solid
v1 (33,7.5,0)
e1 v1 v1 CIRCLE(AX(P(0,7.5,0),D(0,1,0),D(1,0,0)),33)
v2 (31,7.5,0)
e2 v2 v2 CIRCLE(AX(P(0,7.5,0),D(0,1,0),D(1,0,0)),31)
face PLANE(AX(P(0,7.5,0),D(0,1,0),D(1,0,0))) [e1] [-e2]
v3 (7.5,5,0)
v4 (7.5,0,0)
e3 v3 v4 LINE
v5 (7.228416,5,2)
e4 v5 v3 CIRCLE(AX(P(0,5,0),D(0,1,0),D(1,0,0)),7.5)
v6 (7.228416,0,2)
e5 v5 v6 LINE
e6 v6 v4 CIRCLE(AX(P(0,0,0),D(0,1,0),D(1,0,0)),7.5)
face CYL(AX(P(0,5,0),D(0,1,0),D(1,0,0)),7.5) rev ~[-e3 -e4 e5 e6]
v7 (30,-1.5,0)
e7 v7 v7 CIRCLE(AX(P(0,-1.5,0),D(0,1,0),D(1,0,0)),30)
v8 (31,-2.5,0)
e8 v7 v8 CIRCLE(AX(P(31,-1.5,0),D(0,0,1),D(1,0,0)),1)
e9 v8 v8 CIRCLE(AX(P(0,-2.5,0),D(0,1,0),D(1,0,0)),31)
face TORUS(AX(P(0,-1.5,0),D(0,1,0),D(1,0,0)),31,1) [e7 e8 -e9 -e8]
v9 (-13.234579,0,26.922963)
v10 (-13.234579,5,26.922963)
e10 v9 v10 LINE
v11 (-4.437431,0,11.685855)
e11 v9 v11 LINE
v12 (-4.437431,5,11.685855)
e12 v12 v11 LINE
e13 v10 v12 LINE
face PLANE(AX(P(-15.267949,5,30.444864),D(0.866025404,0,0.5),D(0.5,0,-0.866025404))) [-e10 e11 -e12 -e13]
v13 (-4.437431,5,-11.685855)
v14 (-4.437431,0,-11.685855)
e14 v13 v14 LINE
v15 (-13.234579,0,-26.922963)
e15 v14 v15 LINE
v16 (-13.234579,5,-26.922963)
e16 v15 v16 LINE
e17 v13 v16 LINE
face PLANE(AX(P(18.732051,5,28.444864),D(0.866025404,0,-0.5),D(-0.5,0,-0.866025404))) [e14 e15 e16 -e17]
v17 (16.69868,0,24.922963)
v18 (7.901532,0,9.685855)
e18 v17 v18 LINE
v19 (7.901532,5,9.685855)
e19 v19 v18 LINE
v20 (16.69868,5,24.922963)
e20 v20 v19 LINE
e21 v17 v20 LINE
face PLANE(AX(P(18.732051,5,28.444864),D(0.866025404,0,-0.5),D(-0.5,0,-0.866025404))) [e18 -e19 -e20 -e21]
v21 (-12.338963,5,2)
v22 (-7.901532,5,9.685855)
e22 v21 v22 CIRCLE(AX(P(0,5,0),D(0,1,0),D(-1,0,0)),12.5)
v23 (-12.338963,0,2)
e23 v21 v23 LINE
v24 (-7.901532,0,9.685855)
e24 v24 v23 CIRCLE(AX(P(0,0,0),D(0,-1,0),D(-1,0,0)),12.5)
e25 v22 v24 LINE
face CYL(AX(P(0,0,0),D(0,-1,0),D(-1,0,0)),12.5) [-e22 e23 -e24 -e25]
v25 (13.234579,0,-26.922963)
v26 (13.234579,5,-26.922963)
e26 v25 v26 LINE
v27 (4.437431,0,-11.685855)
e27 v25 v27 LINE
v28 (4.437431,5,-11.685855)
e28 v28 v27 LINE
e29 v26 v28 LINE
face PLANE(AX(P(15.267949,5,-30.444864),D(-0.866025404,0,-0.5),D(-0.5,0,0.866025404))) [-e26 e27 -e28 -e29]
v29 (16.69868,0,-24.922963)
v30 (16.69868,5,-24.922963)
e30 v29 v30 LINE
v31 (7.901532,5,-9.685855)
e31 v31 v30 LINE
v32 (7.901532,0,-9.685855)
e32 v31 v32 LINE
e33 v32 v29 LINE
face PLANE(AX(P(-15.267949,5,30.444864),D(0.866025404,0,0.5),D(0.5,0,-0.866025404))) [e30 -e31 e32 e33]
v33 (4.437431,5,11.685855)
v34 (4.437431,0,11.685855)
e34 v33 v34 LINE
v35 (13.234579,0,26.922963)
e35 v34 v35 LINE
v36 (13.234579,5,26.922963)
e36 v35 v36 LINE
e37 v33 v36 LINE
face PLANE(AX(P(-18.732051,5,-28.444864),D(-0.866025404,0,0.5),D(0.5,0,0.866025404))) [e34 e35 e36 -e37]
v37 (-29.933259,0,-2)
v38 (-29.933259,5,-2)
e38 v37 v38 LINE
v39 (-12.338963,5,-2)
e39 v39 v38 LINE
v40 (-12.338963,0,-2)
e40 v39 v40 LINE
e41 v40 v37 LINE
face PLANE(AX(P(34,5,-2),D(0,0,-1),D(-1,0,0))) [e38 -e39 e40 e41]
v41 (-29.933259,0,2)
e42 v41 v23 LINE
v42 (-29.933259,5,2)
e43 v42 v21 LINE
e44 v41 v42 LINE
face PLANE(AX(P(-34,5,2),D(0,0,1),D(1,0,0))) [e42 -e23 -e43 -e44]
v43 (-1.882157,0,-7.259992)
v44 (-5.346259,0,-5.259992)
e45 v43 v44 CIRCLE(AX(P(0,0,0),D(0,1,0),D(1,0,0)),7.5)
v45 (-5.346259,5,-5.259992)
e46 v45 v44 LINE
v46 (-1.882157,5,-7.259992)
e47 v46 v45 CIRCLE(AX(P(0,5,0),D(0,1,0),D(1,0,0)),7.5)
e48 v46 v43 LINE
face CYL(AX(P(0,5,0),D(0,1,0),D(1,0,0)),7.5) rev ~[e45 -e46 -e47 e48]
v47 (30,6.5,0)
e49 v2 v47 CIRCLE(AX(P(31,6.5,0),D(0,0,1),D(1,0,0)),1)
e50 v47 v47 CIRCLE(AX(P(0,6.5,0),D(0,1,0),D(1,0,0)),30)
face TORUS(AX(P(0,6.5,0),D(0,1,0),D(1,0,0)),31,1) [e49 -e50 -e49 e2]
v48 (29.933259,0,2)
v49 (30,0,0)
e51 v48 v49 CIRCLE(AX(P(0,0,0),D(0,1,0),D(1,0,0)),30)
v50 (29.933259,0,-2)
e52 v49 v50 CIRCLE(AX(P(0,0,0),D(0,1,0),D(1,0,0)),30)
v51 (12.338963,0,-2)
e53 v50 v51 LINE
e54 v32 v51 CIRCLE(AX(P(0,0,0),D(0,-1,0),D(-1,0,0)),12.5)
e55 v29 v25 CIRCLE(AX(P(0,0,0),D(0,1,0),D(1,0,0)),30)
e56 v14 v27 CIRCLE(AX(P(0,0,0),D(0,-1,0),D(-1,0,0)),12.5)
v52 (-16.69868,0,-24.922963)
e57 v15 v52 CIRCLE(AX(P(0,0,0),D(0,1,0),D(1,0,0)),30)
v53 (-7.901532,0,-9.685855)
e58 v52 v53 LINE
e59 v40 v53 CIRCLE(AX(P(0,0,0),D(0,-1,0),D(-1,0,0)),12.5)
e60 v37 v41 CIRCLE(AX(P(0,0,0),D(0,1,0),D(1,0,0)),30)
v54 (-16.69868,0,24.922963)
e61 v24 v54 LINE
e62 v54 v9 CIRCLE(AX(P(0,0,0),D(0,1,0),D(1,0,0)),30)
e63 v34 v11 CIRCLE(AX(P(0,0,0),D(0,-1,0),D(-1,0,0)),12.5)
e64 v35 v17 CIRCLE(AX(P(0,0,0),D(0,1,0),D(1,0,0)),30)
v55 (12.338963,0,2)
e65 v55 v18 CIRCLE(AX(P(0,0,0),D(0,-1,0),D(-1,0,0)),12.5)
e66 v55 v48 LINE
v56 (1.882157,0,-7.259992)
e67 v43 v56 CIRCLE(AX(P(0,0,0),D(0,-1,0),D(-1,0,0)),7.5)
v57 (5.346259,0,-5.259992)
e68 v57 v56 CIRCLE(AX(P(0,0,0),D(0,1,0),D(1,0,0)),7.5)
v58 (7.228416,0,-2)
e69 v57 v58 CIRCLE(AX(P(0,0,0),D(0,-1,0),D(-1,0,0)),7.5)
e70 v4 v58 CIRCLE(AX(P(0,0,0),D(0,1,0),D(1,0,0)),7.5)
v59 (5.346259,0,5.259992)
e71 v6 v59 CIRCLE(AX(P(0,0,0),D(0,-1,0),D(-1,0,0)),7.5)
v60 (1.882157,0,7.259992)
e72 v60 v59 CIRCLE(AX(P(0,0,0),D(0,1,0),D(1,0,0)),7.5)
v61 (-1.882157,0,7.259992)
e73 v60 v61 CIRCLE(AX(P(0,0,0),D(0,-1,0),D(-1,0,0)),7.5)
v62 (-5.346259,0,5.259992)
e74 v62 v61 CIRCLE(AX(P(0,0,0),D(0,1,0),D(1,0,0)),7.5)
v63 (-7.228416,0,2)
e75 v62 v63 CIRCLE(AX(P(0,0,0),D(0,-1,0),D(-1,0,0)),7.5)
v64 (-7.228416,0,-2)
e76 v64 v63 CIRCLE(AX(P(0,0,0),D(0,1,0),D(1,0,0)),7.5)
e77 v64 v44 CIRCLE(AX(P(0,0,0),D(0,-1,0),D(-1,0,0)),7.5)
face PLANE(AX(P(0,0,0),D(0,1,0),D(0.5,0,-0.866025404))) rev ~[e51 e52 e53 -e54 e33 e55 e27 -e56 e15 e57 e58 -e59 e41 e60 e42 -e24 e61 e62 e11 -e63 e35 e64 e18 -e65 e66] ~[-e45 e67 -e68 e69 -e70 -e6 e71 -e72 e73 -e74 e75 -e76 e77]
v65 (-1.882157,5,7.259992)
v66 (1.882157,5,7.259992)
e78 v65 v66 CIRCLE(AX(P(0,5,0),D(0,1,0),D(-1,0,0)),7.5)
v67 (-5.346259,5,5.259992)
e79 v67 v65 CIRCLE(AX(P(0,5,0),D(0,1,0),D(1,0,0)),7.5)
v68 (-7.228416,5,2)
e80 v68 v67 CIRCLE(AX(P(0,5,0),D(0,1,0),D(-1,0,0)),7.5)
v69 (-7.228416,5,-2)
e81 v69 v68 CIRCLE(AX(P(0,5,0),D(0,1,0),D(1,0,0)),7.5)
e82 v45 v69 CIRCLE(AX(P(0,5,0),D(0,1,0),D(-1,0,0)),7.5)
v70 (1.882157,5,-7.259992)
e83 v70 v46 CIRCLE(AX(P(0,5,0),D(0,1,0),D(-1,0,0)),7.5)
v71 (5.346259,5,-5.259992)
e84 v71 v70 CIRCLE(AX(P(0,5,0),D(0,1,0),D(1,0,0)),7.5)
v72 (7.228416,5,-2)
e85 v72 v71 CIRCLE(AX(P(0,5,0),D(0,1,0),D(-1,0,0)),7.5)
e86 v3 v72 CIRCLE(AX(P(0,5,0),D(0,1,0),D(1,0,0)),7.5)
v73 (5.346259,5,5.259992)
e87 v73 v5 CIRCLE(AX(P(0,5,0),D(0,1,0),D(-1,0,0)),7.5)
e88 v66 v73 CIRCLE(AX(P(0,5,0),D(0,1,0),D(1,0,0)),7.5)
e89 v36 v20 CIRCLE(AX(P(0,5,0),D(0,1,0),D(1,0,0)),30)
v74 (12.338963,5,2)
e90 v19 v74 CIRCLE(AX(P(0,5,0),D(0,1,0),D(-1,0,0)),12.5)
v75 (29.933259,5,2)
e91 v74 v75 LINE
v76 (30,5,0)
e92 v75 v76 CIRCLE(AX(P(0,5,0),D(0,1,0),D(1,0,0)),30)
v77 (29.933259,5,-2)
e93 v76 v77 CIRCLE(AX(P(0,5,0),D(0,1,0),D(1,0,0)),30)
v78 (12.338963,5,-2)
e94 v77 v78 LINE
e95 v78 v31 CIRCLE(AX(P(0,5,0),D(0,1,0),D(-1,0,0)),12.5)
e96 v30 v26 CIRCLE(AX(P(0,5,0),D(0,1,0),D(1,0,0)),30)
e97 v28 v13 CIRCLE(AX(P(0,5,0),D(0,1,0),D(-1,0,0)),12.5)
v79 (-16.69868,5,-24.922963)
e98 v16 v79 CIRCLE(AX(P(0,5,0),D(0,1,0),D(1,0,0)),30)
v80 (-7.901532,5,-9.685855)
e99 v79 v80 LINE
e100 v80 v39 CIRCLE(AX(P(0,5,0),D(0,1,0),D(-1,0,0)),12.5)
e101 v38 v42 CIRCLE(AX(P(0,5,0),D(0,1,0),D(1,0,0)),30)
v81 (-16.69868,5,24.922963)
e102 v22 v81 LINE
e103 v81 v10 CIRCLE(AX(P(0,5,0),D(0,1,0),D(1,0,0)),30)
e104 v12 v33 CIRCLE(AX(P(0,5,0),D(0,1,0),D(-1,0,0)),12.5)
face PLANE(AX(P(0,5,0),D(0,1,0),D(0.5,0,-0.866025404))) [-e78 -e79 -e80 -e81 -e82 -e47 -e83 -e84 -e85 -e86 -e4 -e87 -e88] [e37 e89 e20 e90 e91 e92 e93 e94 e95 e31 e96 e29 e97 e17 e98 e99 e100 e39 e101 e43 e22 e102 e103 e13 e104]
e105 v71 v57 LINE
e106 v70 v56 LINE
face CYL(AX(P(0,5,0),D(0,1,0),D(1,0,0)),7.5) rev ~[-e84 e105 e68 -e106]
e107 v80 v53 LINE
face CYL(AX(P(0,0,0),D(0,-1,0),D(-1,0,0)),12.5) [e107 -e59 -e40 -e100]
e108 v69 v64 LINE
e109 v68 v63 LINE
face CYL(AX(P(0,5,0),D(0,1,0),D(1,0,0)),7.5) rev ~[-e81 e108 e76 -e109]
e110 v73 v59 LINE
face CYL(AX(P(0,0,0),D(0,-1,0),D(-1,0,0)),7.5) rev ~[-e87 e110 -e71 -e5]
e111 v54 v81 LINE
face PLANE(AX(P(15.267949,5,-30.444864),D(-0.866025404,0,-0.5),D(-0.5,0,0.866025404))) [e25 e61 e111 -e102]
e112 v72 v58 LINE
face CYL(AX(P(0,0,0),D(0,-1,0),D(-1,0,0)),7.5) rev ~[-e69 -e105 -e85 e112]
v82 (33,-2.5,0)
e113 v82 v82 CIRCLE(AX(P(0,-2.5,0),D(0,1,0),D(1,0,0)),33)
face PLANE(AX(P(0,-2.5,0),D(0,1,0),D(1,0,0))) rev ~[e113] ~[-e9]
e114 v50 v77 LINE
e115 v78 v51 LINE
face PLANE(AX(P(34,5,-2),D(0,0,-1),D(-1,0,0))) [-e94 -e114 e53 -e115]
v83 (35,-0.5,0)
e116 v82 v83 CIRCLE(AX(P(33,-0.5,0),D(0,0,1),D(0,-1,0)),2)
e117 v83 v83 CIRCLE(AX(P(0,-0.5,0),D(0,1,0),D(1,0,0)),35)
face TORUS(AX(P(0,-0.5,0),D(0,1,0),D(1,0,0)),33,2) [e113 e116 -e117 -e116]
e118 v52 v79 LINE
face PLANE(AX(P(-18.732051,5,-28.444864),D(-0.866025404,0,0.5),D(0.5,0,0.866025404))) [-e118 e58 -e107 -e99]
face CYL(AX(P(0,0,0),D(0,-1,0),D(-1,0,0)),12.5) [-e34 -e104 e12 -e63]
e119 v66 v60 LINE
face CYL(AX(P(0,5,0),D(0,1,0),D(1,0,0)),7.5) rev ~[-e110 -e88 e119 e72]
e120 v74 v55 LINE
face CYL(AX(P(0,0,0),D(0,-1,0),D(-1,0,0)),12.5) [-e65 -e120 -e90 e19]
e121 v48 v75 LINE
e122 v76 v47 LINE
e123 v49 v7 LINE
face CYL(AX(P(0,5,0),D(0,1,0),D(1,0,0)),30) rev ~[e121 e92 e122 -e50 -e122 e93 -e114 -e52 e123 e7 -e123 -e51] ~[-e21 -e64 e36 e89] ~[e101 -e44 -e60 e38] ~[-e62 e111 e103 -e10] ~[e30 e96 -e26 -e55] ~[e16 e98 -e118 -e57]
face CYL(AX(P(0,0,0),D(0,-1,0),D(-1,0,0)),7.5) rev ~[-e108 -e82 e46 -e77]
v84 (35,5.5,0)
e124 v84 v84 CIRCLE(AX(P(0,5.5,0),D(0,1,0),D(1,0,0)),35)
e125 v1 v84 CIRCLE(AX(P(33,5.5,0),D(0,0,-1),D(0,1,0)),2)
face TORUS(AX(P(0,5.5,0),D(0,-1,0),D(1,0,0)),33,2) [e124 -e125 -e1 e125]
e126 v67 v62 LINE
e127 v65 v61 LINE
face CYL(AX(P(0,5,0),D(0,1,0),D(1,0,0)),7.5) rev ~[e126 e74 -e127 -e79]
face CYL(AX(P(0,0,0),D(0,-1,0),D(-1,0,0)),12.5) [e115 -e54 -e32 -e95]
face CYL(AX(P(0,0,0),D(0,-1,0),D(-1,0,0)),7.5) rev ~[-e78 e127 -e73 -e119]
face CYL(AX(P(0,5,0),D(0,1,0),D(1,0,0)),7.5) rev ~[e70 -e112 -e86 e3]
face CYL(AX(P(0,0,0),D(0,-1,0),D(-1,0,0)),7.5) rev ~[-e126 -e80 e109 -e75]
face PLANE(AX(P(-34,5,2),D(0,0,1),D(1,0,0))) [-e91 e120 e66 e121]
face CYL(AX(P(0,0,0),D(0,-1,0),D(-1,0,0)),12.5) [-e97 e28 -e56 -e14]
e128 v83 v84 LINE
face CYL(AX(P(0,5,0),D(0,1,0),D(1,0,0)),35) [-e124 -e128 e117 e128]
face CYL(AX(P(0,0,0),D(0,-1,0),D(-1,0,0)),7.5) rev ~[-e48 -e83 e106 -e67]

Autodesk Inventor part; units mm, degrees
ref_plane "YZ Plane" through (0, 0, 0) normal (1, 0, 0) x (0, 1, 0)
ref_plane "XZ Plane" through (0, 0, 0) normal (0, 1, 0) x (-1, 0, 0)
ref_plane "XY Plane" through (0, 0, 0) normal (0, 0, 1) x (1, 0, 0)
sketch "스케치1" plane through (0, 0, 0) normal (0, 1, 0) x (-1, 0, 0)
  circle A0 centre (0, 0) radius 37.5
  circle A1 centre (0, 0) radius 7.5
  circle A2 centre (0, 0) radius 12.5
  line L0 (2, 37.5) -> (-2, 37.5)
  line L1 (-2, 37.5) -> (-2, -37.5)
  line L2 (-2, -37.5) -> (2, -37.5)
  line L3 (2, -37.5) -> (2, 37.5)
  dimension "d0" = 75
  dimension "d1" = 15
  dimension "d2" = 25
  dimension "d3" = 2
  dimension "d4" = 2
  dimension "d5" = 75
  dimension "d6" = 37.5
extrude "돌출1" add sketch "스케치1" along normal blind 5 contours L3 A1 L1 A2 | A2 L3 A1 | A2 L1 A1 L3 | L1 A1 A2
sketch "스케치2" plane through (0, 5, 0) normal (0, 1, 0) x (1, 0, 0)
  circle A0 centre (0, 0) radius 35
  circle A1 centre (0, 0) radius 30
  dimension "d9" = 70
  dimension "d10" = 60
extrude "돌출2" add sketch "스케치2" against normal blind 7.5
sketch "스케치3" plane through (0, 5, 0) normal (0, 1, 0) x (1, 0, 0)
  circle A0 centre (0, 0) radius 30 projected
  circle A1 centre (0, 0) radius 35 projected
extrude "돌출3" add sketch "스케치3" along normal blind 2.5
sketch "스케치4" plane through (0, 5, 0) normal (0, 1, 0) x (1, 0, 0)
  line L0 (-34, -2) -> (34, -2)
  line L1 (34, -2) -> (34, 2)
  line L2 (34, 2) -> (-34, 2)
  line L3 (-34, 2) -> (-34, -2)
  point P0 (0, 0)
  dimension "d15" = 68
  dimension "d16" = 4
  dimension "d17" = 2
  dimension "d18" = 34
extrude "돌출4" add sketch "스케치4" against normal blind 5
pattern_circular "원형 패턴1" count 6 over 360 about axis through (0, 0, 0) along (0, 1, 0) of "돌출4"
sketch "스케치5" plane through (0, 5, 0) normal (0, 1, 0) x (1, 0, 0)
  circle A0 centre (0, 0) radius 7.5
  arc A1 (1.8822, 7.26) -> (-1.8822, 7.26) centre (0, 0) ccw projected
extrude "돌출5" cut sketch "스케치5" against normal blind 5
fillet "모깎기1" radius 2 2 edges at (-35, 7.5, 0) (-35, -2.5, 0)
fillet "모깎기2" radius 1 1 edges at (-30, 7.5, 0)
fillet "모깎기3" radius 1 1 edges at (-30, -2.5, 0)
properties part number "앞바퀴2"
